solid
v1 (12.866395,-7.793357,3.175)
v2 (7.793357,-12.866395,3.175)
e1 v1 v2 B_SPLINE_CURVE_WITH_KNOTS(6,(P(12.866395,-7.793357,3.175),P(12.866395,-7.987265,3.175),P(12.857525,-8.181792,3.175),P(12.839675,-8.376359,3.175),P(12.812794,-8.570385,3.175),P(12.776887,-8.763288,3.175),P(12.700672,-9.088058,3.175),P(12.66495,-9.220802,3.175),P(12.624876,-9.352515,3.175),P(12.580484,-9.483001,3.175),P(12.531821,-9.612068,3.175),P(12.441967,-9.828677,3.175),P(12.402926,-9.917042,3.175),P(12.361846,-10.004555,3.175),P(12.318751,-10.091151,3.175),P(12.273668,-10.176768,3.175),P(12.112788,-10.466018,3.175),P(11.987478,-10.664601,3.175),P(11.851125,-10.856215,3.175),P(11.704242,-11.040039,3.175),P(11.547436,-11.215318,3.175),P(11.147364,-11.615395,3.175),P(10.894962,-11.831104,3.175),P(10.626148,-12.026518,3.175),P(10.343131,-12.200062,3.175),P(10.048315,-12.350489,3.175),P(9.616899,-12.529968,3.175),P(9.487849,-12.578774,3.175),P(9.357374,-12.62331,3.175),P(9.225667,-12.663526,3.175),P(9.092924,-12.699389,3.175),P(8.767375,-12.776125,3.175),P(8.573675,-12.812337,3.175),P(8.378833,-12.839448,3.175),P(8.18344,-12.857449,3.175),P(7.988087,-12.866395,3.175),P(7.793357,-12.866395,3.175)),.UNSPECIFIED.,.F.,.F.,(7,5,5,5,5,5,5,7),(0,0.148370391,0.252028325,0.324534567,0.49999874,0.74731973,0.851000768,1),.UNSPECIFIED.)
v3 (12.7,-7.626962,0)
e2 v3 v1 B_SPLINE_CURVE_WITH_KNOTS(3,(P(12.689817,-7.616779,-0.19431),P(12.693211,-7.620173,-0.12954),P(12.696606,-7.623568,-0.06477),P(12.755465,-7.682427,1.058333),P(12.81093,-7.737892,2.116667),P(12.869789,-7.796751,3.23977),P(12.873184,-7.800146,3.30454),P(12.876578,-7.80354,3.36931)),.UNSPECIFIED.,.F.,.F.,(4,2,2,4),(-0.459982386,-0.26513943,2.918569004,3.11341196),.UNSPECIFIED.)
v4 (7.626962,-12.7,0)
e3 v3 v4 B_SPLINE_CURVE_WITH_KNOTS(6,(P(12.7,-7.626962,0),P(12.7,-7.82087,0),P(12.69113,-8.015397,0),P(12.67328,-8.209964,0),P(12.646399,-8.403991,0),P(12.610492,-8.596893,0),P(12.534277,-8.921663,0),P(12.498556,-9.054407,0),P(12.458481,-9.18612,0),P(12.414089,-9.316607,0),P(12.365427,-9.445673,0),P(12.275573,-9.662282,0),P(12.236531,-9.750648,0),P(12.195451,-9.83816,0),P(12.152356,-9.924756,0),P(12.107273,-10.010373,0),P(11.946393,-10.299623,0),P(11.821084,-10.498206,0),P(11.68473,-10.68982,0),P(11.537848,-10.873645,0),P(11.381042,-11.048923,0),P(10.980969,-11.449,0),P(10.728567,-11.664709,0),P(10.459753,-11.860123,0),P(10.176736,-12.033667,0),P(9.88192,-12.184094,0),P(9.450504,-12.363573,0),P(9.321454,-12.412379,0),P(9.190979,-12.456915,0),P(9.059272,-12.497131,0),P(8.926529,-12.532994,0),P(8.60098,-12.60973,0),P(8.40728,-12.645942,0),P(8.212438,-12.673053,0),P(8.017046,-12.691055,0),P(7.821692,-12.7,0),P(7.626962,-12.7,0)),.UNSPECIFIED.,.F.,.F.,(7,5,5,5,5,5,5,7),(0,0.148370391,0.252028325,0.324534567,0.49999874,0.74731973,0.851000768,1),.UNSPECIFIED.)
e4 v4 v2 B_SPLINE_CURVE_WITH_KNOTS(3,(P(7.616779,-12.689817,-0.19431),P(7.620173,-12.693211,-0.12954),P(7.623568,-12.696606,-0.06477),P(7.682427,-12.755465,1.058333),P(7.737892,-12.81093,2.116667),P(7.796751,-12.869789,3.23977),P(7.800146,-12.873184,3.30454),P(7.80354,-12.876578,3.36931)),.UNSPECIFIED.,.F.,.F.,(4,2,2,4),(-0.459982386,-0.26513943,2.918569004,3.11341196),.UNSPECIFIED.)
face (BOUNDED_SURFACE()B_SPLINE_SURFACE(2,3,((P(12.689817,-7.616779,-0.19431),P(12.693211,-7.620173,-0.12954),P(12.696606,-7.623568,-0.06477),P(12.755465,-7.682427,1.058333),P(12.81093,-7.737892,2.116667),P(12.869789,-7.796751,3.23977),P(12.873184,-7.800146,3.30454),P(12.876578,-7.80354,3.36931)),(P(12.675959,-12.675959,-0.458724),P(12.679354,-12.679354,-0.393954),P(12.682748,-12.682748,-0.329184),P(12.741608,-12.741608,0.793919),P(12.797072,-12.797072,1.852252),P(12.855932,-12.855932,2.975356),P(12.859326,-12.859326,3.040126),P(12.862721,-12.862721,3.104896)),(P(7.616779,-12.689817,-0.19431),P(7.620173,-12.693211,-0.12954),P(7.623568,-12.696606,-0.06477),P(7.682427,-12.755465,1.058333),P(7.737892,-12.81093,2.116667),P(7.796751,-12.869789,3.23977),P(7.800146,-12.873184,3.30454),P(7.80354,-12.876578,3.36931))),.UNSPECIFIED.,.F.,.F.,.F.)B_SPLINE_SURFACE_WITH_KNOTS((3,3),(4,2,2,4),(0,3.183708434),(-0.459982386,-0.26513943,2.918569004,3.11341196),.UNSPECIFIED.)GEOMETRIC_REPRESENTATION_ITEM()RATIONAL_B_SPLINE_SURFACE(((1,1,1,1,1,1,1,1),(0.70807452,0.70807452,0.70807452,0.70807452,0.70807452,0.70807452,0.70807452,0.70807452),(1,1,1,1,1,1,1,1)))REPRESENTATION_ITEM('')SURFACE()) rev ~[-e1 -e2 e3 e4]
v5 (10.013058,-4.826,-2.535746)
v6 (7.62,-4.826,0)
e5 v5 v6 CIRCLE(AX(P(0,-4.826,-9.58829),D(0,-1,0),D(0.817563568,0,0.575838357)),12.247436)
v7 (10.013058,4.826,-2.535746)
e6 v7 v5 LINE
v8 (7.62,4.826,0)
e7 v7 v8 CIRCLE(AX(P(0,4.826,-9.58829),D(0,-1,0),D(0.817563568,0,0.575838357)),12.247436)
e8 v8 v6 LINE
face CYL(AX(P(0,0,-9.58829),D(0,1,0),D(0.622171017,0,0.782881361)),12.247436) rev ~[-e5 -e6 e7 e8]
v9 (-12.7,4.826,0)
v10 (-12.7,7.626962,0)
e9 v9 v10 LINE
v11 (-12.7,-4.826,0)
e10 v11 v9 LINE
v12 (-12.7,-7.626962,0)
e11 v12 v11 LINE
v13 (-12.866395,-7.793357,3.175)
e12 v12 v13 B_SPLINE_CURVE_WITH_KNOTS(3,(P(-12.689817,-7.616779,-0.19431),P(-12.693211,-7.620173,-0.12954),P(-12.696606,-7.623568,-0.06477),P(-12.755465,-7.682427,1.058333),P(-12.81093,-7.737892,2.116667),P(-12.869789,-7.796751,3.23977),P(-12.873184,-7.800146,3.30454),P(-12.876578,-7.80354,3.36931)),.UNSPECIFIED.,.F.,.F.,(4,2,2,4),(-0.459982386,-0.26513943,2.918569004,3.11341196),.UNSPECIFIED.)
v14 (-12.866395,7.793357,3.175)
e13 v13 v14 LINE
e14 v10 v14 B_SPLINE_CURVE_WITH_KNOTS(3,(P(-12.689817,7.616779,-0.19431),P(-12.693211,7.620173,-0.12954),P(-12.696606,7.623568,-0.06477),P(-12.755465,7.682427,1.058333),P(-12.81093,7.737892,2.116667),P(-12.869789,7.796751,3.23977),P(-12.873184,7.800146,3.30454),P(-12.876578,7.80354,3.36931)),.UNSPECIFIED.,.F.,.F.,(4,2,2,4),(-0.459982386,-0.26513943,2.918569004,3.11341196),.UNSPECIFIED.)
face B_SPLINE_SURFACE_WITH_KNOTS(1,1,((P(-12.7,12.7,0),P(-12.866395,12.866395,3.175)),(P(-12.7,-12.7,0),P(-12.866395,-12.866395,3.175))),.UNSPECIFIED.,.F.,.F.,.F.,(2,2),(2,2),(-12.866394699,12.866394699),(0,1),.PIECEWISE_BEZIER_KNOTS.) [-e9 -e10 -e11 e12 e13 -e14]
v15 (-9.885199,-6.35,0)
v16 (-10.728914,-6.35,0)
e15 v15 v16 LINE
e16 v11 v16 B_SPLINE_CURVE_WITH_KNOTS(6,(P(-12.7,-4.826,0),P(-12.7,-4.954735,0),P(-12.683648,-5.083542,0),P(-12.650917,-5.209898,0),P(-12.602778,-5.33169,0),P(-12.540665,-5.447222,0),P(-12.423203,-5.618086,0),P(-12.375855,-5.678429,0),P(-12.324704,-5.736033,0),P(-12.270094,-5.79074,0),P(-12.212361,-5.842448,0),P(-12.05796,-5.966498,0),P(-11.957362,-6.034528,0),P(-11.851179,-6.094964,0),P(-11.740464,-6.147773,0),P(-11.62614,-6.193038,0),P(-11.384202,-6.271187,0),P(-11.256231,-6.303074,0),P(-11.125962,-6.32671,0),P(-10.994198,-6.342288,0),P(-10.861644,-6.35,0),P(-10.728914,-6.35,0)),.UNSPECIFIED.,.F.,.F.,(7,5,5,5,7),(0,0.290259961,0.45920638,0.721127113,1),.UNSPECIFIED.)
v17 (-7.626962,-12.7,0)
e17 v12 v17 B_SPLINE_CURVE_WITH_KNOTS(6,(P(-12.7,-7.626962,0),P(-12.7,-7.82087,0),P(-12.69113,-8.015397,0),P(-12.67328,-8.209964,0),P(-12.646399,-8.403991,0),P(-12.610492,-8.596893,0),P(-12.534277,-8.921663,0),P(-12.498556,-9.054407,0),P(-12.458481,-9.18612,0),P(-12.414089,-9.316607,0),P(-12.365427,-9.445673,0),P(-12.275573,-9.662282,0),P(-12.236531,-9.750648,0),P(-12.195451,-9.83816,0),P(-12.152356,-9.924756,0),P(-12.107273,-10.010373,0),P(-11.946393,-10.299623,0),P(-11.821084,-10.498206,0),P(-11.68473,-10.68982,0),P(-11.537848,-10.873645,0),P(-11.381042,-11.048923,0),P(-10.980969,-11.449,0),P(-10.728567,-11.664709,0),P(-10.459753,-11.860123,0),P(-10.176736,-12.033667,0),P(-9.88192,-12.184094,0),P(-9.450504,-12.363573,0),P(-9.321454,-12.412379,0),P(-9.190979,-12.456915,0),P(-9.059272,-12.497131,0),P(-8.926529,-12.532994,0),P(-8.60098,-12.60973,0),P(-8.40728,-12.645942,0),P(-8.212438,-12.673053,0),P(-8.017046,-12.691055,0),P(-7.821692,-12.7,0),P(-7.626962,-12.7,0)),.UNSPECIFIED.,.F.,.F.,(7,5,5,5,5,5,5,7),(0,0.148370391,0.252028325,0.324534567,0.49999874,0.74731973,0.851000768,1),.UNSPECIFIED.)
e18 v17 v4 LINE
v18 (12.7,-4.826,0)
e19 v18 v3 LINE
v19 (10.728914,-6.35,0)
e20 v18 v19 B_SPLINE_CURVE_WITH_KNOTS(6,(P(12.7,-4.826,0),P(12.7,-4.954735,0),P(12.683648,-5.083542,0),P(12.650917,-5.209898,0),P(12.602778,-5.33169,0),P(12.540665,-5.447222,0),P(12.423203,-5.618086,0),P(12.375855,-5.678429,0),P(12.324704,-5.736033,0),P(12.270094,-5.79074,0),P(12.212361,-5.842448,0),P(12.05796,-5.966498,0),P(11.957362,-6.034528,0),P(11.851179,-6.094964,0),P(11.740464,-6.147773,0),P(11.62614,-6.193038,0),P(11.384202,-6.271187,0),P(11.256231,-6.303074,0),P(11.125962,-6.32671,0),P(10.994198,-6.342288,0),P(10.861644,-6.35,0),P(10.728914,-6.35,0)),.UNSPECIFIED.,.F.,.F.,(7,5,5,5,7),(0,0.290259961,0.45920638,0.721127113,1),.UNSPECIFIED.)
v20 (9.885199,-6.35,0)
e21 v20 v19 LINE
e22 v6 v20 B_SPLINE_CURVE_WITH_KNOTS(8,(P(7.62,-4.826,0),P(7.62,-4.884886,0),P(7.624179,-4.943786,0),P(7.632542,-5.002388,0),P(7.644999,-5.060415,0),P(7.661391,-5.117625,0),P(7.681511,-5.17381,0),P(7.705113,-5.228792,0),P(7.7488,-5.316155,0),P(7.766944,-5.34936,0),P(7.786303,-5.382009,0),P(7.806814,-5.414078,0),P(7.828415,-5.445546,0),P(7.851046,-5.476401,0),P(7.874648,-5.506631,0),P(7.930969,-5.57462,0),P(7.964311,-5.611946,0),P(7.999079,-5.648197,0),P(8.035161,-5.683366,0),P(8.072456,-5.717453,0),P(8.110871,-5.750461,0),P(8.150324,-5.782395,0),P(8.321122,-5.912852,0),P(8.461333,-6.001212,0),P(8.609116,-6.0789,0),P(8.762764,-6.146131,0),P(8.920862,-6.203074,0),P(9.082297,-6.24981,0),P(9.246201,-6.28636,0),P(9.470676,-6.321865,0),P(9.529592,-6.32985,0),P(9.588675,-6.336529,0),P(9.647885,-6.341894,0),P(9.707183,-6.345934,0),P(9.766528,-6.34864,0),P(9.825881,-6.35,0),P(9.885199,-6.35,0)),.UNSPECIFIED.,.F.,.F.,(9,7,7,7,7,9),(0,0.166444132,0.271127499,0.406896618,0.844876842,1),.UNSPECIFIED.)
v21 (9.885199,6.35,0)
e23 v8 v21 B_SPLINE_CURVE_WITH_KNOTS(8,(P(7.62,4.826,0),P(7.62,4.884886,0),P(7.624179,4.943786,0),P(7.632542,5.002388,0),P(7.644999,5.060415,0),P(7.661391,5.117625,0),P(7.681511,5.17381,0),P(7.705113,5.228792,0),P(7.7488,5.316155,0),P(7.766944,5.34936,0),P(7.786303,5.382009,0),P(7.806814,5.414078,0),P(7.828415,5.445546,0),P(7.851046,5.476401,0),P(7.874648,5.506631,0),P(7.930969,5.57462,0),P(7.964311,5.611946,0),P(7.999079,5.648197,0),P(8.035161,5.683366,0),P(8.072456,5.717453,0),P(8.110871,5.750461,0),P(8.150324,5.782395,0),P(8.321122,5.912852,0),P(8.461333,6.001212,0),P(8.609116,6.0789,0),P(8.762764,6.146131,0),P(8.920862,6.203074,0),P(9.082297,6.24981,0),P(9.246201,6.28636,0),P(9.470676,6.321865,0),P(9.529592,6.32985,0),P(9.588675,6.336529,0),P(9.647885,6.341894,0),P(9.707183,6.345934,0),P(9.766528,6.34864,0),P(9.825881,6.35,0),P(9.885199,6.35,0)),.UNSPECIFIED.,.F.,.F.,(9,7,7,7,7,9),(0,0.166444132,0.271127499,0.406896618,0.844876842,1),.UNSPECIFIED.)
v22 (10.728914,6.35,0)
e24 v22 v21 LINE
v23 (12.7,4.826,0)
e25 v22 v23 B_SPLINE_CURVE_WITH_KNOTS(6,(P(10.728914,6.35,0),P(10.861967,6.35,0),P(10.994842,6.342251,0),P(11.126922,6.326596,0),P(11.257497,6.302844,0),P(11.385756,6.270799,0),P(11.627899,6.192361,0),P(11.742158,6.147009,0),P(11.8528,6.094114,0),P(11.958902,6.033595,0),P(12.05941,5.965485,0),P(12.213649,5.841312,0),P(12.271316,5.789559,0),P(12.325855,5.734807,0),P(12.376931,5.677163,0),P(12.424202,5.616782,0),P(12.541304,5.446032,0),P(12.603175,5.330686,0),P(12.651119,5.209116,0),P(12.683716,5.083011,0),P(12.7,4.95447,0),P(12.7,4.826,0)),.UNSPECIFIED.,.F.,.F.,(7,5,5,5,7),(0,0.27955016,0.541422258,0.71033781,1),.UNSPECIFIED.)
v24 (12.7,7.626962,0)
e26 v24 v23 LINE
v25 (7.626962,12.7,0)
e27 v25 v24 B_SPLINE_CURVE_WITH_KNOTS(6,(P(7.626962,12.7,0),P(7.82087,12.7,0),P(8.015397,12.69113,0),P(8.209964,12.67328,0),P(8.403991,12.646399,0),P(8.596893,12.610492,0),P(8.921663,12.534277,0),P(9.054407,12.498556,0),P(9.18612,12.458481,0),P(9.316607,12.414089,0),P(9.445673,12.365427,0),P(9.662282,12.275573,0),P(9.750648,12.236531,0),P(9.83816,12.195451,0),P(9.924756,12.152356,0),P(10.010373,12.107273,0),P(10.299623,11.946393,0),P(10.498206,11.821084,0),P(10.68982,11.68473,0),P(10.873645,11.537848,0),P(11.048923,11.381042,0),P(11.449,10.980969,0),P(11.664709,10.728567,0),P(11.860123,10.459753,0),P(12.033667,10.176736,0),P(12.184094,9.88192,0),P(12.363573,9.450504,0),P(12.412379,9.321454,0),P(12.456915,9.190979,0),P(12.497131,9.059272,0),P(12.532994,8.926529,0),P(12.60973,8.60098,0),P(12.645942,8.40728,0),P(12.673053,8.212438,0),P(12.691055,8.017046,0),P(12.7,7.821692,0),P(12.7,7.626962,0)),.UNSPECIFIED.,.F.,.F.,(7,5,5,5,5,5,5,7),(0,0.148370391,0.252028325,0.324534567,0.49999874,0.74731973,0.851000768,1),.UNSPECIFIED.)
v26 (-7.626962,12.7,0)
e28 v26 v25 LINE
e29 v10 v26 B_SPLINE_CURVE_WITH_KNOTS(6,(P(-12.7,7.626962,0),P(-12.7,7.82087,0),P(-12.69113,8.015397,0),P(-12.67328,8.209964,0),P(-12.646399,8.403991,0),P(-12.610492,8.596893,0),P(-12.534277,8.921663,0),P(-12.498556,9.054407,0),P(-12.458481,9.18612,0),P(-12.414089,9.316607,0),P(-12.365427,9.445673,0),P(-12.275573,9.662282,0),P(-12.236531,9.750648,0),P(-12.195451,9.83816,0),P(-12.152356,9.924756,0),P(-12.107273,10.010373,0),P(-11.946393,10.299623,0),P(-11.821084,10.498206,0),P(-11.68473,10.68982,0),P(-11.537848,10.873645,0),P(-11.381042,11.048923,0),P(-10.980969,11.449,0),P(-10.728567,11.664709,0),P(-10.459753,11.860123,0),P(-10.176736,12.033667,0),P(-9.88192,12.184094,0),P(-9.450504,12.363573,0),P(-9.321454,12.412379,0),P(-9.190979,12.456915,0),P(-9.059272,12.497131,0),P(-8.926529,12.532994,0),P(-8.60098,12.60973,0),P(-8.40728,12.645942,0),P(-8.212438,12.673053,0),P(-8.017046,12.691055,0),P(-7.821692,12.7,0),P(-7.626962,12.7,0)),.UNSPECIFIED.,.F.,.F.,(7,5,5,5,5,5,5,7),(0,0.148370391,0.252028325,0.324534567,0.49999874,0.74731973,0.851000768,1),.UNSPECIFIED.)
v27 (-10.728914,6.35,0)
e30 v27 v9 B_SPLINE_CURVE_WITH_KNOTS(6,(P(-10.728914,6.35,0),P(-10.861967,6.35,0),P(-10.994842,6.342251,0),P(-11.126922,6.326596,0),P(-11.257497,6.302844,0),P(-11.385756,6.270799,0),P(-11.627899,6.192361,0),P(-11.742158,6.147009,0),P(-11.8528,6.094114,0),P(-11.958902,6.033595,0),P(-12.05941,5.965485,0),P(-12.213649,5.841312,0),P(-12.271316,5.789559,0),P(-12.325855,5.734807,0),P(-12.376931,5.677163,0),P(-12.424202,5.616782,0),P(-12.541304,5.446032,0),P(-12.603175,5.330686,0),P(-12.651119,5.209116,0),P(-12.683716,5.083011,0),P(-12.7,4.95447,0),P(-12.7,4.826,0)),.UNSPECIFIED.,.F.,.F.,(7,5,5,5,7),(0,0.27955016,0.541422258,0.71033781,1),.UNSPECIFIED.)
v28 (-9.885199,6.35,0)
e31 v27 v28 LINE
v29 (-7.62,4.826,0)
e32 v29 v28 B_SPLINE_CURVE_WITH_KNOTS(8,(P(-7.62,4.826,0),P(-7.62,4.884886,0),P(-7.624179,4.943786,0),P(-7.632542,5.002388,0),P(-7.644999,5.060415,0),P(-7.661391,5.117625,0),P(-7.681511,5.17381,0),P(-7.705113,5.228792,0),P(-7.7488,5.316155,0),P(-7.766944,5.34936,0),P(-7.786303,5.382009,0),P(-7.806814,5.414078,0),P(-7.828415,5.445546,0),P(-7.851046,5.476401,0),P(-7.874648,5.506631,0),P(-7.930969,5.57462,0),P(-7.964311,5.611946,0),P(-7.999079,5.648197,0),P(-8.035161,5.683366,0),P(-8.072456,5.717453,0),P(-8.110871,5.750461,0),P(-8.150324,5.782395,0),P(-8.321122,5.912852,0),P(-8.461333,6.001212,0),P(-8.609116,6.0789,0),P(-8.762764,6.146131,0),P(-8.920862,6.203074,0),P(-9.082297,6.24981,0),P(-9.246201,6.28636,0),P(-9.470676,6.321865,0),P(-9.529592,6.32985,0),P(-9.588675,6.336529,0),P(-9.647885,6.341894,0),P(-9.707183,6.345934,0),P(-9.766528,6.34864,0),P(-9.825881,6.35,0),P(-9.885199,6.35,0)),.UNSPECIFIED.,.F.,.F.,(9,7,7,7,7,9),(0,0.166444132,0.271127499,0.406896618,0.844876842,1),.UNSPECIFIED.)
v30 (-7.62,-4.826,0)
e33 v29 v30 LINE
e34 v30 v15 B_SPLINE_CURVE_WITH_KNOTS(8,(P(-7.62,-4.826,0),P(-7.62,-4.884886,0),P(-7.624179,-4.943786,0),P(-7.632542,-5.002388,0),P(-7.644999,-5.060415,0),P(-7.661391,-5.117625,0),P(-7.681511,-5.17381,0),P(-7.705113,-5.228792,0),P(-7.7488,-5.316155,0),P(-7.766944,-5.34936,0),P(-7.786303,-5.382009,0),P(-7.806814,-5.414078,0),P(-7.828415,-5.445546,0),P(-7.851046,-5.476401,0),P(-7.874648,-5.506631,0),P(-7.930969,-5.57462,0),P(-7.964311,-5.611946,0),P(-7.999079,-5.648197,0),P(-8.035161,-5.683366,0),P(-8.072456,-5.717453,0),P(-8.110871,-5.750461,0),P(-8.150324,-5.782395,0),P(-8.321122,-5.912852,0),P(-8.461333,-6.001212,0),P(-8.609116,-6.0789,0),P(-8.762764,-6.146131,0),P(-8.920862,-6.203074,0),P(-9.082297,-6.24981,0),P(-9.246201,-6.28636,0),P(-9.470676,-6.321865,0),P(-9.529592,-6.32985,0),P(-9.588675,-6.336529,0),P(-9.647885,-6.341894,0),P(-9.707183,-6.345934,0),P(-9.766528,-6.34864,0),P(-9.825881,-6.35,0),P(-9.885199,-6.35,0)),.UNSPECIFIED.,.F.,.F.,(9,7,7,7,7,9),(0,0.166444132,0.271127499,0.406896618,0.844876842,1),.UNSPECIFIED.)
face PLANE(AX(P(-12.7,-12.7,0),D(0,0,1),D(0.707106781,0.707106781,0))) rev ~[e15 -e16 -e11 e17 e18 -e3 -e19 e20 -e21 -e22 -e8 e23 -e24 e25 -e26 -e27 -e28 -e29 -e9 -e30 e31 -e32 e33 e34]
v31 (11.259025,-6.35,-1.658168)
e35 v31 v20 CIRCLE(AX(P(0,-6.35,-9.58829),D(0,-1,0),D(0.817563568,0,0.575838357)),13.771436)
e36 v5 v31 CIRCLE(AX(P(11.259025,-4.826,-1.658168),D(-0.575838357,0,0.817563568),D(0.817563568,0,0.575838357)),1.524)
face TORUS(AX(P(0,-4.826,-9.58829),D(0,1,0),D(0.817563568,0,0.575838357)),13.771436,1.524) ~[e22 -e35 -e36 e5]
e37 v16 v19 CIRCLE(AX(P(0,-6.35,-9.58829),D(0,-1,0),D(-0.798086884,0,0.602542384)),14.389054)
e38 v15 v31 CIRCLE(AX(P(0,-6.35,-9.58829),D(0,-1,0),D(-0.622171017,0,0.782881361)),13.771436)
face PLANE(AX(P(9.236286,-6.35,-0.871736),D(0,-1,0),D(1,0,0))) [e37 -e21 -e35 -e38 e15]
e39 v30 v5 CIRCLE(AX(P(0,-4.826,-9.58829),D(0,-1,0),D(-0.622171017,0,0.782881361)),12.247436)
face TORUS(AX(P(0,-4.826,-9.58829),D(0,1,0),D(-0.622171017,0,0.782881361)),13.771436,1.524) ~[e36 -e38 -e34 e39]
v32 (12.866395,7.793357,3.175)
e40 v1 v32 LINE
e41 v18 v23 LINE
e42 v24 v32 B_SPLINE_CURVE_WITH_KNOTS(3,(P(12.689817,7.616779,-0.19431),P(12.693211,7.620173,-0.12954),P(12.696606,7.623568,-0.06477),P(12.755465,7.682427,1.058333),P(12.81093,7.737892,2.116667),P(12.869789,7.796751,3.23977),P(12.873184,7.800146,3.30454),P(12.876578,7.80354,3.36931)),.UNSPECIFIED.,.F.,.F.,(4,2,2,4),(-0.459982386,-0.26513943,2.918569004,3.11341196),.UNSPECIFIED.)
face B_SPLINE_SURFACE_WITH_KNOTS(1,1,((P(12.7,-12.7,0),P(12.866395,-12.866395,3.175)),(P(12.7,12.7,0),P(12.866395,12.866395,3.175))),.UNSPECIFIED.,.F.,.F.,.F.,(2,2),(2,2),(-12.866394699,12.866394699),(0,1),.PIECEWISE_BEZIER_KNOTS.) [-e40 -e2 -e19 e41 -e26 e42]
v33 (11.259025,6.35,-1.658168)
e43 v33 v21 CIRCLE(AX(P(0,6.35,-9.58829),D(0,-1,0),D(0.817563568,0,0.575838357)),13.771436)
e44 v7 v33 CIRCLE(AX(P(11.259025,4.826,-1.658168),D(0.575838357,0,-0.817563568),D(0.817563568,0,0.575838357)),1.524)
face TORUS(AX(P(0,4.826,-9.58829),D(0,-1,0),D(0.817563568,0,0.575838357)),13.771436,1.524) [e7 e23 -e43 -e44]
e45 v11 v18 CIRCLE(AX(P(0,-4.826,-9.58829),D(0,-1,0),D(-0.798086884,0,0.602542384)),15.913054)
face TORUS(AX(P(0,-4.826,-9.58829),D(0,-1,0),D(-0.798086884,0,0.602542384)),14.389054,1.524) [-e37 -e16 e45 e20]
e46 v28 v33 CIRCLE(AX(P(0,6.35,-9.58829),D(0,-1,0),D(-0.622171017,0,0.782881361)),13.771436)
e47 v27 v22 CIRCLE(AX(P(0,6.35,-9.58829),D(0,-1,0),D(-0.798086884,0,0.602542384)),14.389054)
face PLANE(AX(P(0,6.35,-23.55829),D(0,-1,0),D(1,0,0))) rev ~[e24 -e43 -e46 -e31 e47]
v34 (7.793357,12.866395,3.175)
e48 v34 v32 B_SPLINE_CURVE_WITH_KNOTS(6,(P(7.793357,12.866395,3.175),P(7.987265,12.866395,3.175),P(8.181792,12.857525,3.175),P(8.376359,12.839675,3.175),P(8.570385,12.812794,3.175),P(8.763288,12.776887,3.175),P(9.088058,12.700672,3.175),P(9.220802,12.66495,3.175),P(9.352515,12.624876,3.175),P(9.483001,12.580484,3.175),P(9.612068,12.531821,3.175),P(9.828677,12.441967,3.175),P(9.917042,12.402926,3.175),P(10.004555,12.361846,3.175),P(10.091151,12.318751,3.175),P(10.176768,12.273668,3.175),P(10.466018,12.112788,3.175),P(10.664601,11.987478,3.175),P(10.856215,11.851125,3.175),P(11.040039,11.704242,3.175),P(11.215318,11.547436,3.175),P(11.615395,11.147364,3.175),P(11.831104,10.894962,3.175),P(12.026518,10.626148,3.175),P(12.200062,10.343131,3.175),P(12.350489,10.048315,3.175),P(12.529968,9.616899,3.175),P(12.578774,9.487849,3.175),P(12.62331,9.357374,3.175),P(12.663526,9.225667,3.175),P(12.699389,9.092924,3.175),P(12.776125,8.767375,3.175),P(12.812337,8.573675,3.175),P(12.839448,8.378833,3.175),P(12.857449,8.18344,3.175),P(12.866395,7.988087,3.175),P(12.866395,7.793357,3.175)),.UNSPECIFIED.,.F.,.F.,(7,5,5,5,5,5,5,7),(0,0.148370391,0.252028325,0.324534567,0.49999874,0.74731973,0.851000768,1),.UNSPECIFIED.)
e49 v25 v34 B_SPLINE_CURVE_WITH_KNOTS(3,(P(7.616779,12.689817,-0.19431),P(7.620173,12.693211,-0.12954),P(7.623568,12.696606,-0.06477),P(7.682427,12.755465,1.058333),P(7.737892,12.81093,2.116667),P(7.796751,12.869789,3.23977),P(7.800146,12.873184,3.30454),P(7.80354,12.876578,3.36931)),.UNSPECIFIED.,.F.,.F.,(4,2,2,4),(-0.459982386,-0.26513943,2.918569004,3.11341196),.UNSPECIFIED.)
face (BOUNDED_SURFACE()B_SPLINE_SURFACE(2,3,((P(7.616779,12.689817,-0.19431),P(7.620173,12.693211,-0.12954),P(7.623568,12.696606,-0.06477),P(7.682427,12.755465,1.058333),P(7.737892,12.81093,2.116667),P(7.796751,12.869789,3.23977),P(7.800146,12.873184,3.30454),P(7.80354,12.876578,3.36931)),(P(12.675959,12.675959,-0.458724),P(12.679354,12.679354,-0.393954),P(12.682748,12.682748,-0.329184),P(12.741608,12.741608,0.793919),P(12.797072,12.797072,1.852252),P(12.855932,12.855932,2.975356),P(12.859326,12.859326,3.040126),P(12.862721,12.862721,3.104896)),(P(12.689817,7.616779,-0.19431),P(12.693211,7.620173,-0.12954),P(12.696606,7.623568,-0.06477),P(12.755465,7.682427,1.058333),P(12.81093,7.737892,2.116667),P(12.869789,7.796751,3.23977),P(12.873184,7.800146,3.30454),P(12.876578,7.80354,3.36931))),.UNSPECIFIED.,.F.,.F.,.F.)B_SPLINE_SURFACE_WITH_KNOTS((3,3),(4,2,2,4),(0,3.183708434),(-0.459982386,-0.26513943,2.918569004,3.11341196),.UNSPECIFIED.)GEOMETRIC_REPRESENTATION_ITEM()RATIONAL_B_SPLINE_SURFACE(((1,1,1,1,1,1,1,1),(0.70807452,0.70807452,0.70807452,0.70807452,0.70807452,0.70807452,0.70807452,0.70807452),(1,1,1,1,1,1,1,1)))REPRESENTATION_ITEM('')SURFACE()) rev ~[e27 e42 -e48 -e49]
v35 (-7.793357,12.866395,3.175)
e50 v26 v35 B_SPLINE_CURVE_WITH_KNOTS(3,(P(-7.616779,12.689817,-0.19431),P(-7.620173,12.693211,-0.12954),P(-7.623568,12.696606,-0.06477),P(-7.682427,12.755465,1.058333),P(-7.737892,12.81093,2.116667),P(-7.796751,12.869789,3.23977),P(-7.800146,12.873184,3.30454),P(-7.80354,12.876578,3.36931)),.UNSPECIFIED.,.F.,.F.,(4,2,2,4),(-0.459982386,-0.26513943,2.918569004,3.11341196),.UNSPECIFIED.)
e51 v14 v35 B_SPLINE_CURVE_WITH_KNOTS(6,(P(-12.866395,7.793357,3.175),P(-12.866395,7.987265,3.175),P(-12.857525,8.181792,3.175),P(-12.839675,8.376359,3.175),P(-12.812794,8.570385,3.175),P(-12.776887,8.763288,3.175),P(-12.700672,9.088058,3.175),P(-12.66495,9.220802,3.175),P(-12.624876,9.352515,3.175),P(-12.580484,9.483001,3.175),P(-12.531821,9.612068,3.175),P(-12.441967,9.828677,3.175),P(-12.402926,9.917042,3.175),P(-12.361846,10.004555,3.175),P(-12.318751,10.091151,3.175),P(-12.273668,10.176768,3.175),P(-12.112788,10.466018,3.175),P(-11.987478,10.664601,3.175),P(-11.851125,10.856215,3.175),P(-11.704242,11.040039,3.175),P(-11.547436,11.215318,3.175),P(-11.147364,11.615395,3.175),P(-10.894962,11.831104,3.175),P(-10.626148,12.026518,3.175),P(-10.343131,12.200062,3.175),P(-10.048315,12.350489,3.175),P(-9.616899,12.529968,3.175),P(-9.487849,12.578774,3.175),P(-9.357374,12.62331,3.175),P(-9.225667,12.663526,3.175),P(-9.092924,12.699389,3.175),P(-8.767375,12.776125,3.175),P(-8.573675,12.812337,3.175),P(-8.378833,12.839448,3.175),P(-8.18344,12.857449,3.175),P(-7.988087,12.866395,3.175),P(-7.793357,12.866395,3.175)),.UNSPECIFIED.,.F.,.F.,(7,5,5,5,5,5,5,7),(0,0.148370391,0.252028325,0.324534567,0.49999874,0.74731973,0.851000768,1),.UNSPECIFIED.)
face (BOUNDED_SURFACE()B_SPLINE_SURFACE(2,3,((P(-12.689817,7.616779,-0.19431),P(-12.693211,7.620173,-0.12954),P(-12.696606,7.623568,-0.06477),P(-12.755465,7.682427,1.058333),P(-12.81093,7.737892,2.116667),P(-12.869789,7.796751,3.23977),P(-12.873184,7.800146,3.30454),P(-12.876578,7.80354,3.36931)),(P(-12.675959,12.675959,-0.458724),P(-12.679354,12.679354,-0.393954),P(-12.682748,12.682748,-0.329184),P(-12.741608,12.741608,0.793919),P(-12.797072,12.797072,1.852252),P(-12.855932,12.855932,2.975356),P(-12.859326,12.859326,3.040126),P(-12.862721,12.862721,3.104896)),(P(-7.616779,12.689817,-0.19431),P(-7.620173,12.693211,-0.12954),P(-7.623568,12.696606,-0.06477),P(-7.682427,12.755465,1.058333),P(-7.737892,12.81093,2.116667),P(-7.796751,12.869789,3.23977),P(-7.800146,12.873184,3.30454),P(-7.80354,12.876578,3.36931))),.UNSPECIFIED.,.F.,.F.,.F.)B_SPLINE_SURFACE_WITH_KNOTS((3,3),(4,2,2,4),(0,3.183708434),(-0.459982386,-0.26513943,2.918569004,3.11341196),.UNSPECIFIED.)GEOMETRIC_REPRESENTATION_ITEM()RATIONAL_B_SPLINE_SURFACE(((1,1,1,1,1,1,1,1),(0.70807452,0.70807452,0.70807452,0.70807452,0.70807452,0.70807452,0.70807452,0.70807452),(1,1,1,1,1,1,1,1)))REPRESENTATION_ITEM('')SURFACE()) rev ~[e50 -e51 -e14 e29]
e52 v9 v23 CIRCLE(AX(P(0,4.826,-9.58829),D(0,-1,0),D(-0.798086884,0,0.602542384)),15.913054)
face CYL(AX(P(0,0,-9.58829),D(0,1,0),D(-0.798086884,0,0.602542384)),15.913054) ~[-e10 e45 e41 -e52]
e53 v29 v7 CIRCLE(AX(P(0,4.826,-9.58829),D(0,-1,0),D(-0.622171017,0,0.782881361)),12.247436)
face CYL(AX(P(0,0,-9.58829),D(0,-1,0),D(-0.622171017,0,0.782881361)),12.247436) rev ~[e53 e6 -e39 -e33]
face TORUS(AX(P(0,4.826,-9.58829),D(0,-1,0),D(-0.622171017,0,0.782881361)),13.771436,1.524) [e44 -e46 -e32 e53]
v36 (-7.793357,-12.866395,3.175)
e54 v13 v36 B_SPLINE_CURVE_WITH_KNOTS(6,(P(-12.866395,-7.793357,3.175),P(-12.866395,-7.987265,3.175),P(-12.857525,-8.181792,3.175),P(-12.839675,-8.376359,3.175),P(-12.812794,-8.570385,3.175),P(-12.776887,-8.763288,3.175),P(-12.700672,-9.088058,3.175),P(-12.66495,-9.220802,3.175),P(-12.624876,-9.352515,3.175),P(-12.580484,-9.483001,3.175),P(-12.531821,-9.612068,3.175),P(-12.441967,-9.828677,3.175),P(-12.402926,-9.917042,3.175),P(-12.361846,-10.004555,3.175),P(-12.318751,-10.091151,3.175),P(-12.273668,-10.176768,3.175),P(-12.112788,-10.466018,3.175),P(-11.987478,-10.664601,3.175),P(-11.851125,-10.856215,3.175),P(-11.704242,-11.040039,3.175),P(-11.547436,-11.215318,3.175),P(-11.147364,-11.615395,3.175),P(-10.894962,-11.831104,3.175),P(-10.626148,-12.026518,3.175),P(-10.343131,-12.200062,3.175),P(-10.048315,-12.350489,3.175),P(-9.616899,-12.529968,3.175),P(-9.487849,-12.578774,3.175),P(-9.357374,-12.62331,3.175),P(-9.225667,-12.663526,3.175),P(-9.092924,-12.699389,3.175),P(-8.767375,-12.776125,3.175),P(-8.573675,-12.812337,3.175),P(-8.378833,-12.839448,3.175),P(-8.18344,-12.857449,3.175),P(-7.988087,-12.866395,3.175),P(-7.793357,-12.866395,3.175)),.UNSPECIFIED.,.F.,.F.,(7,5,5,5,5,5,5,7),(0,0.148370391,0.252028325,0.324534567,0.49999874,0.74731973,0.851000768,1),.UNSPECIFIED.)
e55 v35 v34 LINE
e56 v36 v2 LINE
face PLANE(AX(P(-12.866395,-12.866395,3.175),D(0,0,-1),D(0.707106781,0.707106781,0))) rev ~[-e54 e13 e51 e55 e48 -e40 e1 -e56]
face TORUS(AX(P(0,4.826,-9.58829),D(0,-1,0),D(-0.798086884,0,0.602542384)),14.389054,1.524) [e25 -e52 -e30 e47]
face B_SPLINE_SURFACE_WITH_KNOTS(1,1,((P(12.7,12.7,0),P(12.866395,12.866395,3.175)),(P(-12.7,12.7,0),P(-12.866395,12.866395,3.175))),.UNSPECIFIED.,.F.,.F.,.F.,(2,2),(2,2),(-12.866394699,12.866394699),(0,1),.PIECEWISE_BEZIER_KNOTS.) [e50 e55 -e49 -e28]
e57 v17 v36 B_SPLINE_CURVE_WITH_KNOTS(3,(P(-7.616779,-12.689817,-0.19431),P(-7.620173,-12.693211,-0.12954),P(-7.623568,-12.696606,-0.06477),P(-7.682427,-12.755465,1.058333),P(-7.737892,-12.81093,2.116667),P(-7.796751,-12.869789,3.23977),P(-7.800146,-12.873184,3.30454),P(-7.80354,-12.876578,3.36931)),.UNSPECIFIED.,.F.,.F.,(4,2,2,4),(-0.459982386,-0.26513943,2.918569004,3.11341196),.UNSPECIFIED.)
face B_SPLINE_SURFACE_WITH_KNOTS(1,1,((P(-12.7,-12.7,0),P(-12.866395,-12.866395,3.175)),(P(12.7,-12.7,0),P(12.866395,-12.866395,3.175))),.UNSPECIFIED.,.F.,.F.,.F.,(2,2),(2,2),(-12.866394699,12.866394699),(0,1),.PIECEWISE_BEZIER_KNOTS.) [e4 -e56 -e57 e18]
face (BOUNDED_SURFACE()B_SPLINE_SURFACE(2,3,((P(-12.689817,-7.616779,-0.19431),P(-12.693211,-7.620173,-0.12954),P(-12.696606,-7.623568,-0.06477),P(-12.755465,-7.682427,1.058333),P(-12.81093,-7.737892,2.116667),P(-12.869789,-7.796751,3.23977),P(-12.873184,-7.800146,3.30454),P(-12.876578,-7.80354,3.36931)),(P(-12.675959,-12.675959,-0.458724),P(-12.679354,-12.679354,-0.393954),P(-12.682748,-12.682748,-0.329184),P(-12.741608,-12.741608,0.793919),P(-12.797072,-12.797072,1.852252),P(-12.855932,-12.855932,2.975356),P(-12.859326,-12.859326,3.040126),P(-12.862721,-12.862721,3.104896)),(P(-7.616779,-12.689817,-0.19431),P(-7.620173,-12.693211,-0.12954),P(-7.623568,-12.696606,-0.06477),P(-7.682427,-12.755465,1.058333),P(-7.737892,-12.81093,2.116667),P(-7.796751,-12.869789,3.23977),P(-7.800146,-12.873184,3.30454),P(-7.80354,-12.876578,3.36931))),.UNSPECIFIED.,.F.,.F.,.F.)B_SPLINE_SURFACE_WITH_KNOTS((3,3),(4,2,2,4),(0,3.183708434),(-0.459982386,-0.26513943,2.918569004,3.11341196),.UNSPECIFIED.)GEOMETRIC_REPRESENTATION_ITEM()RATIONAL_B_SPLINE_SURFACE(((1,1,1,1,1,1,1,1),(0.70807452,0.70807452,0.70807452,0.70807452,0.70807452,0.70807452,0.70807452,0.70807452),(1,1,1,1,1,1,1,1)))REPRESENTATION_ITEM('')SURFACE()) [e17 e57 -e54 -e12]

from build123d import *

# Parameters (mm, degrees)
F0_W          = 25.4
F0_H          = 25.4
F1_DEPTH      = 3.175
F1_TAPER      = -3
F3_W          = 5.08
F3_H          = 12.7
F6_DEPTH      = 6.35
F6_DEPTH_BACK = 6.35
F7_R          = 5.08
F8_R          = 1.524


with BuildPart() as f1:
    # F0 (on Top) → F1 (new body)
    with BuildSketch(Plane.XY):
        Rectangle(F0_W, F0_H)
    extrude(amount=F1_DEPTH, taper=F1_TAPER)

    # F4: sweep along a path in F2
    with BuildLine(Plane.XZ) as f4_path:
        ThreePointArc((-10.16, 0), (0, -23.5582897328), (10.16, 0))
    # F3 (on face) → F4 (sweep)
    with BuildSketch(Plane(origin=(0, 0, 0), x_dir=(1, 0, 0), z_dir=(0, 0, -1))):
        with Locations((-10.16, 0)):
            Rectangle(F3_W, F3_H)
    sweep(path=f4_path.line)

    # F5 (on Front) → F6 (join, two sides)
    with BuildSketch(Plane.XZ) as f6_sk:
        with BuildLine():
            Line((10.0130578512, -2.535746045), (10.16, 0))
            Line((10.16, 0), (7.62, 0))
            ThreePointArc((7.62, 0), (8.9072265211, -1.1822790439), (10.0130578512, -2.535746045))
        make_face()
    extrude(amount=F6_DEPTH)
    extrude(f6_sk.sketch, amount=-F6_DEPTH_BACK)

    # F7
    f7_edges = [f1.edges().sort_by_distance(p)[0] for p in [
        (-12.783197, -12.783197, 1.5875),
        (-12.783197, 12.783197, 1.5875),
        (12.783197, 12.783197, 1.5875),
        (12.783197, -12.783197, 1.5875),
    ]]
    fillet(f7_edges, radius=F7_R)

    # F8
    f8_edges = [f1.edges().sort_by_distance(p)[0] for p in [
        (-1.743325, -6.35, -21.711017),
        (8.907227, -6.35, -1.182279),
        (-1.743325, 6.35, -21.711017),
        (0, 6.35, -25.501344),
        (0, -6.35, -25.501344),
        (8.907227, 6.35, -1.182279),
    ]]
    fillet(f8_edges, radius=F8_R)


solid = f1.part
